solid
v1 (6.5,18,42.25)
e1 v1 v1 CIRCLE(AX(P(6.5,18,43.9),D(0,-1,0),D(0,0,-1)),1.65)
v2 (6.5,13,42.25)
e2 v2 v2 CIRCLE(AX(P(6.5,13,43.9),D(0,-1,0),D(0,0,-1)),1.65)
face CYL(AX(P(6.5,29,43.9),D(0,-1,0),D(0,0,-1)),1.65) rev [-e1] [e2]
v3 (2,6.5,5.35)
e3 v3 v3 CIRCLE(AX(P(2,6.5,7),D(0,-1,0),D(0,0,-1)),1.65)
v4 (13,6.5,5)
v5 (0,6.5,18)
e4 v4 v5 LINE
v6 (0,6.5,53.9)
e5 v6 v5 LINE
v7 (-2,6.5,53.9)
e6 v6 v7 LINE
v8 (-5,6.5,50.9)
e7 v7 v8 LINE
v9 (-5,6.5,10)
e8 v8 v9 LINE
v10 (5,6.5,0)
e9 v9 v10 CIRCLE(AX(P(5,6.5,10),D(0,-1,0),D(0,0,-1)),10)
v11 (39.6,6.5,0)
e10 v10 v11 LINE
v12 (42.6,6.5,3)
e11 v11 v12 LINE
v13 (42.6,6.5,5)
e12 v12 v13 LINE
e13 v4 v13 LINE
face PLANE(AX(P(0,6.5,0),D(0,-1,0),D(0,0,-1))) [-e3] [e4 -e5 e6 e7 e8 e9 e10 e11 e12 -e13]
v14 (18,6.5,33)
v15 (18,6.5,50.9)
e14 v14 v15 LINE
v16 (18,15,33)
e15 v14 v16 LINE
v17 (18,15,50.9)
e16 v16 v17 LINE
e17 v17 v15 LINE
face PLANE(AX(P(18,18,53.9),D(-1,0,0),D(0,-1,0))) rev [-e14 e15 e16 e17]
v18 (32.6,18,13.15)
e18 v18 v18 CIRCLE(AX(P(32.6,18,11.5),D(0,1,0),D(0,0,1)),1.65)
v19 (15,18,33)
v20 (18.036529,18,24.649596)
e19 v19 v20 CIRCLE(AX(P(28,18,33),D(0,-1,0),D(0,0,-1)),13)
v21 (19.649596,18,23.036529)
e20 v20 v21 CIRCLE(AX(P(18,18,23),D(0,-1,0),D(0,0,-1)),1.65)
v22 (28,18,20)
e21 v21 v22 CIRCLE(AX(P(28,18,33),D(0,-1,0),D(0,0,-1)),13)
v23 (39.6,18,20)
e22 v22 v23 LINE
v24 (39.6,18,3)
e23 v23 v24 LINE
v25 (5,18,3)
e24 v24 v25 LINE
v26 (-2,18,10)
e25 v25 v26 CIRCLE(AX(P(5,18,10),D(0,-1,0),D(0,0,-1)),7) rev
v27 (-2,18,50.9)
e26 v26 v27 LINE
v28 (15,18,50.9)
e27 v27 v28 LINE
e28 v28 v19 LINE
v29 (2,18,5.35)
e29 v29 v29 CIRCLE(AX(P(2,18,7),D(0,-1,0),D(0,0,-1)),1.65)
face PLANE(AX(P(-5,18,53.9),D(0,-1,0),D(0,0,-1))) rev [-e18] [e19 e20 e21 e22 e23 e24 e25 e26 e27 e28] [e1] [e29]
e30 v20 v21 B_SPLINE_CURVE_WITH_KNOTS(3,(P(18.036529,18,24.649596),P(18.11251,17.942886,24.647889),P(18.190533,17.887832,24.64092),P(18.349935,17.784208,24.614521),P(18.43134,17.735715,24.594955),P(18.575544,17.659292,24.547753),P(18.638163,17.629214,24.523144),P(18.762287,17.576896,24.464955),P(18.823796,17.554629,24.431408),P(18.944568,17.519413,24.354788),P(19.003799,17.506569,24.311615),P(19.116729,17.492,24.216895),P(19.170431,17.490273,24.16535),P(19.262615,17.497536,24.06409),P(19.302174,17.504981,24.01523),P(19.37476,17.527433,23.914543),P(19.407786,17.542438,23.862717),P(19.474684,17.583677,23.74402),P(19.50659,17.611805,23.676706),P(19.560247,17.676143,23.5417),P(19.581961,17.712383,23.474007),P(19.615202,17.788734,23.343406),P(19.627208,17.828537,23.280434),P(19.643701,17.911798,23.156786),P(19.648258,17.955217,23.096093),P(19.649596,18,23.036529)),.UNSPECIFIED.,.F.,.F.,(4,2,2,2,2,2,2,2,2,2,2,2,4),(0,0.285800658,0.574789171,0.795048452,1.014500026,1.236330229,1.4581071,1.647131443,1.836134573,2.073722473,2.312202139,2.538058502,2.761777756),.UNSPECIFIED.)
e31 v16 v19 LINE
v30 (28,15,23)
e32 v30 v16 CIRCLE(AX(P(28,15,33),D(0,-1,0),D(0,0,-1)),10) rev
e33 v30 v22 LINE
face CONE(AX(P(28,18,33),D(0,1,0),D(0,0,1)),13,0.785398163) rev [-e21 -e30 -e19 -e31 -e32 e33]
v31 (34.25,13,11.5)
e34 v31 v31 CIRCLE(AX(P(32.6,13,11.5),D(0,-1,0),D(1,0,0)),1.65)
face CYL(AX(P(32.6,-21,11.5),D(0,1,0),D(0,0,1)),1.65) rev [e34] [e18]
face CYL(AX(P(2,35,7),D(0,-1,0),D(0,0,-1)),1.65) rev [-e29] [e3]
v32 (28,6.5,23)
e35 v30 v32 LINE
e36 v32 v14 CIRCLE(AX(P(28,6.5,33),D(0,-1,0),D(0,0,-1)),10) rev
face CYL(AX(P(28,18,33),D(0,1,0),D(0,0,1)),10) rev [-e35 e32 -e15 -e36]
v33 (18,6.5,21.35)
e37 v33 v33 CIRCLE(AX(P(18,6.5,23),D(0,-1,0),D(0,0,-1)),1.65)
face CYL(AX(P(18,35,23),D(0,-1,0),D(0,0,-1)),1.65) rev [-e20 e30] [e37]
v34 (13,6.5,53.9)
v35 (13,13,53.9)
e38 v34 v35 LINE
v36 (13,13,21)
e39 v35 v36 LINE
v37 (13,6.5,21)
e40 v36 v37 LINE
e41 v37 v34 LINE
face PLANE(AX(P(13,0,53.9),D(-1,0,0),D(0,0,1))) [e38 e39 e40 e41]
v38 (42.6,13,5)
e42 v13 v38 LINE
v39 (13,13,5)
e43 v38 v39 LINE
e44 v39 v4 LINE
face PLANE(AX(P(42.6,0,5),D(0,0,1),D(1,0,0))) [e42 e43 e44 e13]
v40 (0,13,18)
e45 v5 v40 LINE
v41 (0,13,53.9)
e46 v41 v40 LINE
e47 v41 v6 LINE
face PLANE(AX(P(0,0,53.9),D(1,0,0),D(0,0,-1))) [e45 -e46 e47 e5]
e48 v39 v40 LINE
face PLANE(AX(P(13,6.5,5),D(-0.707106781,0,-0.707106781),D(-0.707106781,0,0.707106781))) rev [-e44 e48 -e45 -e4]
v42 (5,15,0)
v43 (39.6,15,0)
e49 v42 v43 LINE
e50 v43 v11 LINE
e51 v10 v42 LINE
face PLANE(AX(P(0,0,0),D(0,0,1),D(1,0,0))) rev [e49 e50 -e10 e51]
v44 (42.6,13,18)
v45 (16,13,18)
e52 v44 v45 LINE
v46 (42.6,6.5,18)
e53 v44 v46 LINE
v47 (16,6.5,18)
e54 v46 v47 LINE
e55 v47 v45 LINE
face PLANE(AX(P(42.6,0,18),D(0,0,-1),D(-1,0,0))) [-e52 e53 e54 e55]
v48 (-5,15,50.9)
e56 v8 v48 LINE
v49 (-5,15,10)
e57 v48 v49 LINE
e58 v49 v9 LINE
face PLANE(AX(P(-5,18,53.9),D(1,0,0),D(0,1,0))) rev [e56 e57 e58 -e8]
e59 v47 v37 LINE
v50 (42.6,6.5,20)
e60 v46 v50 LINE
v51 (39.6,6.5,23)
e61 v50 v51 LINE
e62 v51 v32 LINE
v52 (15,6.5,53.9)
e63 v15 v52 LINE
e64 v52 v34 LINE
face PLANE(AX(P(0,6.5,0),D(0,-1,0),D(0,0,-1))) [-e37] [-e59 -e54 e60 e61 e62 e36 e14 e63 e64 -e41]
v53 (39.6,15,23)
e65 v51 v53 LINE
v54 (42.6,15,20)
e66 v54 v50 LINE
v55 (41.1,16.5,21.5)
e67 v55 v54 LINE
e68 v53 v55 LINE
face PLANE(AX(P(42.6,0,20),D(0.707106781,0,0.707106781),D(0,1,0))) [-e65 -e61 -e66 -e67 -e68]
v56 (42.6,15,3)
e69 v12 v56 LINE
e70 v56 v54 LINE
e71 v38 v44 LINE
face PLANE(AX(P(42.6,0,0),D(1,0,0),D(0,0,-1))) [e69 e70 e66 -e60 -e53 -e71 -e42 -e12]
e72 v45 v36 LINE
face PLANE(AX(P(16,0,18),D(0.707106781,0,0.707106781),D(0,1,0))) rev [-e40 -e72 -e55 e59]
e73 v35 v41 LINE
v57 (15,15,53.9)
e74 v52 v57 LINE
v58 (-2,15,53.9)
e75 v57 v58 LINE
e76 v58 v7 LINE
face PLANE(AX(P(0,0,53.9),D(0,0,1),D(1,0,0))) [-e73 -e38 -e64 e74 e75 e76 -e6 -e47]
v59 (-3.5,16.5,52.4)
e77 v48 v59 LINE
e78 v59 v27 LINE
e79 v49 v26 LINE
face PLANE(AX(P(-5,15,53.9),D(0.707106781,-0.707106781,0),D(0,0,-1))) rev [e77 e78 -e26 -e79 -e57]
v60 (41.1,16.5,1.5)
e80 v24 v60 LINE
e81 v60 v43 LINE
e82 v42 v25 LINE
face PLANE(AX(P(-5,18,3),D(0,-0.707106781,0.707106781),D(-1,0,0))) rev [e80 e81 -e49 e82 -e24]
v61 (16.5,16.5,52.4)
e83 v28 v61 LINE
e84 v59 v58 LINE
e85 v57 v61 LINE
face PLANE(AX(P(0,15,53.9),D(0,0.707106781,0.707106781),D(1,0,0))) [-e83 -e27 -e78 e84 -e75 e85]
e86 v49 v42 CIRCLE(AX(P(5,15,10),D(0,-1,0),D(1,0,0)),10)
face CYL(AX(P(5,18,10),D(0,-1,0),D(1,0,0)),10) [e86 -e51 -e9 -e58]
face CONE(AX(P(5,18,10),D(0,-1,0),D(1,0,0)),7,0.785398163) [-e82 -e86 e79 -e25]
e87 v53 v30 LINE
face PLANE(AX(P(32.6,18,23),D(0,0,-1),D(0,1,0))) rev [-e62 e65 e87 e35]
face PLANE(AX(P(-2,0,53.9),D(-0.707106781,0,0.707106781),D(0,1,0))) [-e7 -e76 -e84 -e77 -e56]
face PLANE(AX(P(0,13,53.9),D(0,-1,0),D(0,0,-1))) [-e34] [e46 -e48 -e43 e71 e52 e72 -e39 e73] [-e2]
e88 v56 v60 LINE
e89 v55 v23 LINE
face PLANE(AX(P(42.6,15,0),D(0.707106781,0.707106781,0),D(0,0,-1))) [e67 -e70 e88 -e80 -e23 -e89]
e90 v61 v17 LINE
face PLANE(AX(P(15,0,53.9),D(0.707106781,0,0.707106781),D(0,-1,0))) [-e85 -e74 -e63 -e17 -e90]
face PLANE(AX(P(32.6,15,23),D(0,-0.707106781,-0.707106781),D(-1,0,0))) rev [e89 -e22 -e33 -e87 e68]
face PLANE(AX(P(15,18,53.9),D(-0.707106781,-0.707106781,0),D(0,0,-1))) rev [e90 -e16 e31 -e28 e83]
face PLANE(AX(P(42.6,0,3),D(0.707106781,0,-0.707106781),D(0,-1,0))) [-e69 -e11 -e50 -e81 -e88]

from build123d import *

# Parameters (mm, degrees)
SKETCH_1_W          = 23
SKETCH_1_H          = 23
SKETCH_1_W_2        = 13
SKETCH_1_H_2        = 13
EXTRUDE_1_DEPTH     = 53.9
SKETCH_2_R          = 1.65
CUT_EXTRUDE_1_DEPTH = 34
SKETCH_4_W          = 23
SKETCH_4_H          = 23
SKETCH_4_R          = 3
EXTRUDE_2_DEPTH     = 14.6
SKETCH_5_W          = 23
SKETCH_5_H          = 23
SKETCH_5_W_2        = 13
SKETCH_5_H_2        = 13
EXTRUDE_1_2_DEPTH   = 10
SKETCH_6_R          = 1.65
CUT_EXTRUDE_2_DEPTH = 39
SKETCH_7_W          = 13
SKETCH_7_H          = 13
CUT_EXTRUDE_3_DEPTH = 24.6
CHAMFER_1_SIZE      = 3
SKETCH_8_W          = 47.6
SKETCH_8_H          = 53.9
CUT_EXTRUDE_4_DEPTH = 11.5
EXTRUDE_3_DEPTH     = 6.5
FILLET_1_R          = 10
FILLET_2_R          = 10
SKETCH_10_R         = 1.65
CUT_EXTRUDE_5_DEPTH = 28.5
CHAMFER_3_SIZE      = 3
CHAMFER_4_SIZE      = 3
CHAMFER_5_SIZE      = 3


with BuildPart() as part:
    # 草图1 → Extrude 1 (new body)
    with BuildSketch(Plane.XY):
        with Locations((6.5, 6.5)):
            Rectangle(SKETCH_1_W, SKETCH_1_H)
        with Locations((6.5, 6.5)):
            Rectangle(SKETCH_1_W_2, SKETCH_1_H_2, mode=Mode.SUBTRACT)
    extrude(amount=EXTRUDE_1_DEPTH)

    # 草图2 → 切除-拉伸1 (cut)
    with BuildSketch(Plane.XZ.offset(5)):
        with Locations(Location((6.5, 43.9, 0), (0, 0, 270))):
            Circle(SKETCH_2_R)
    extrude(amount=-CUT_EXTRUDE_1_DEPTH, mode=Mode.SUBTRACT)

    # 草图4 → 凸台-拉伸2 (add)
    with BuildSketch(Plane(origin=(18, 0, 0), x_dir=(0, 0, -1), z_dir=(1, 0, 0))):
        with Locations((-11.5, 6.5)):
            Rectangle(SKETCH_4_W, SKETCH_4_H)
        with Locations(Location((-11.5, 6.5, 0), (0, 0, 90))):
            Circle(SKETCH_4_R, mode=Mode.SUBTRACT)
    extrude(amount=EXTRUDE_2_DEPTH)

    # 草图5 → Extrude 1 2 (add)
    with BuildSketch(Plane(origin=(32.6, 0, 0), x_dir=(0, 0, -1), z_dir=(1, 0, 0))):
        with Locations((-11.5, 6.5)):
            Rectangle(SKETCH_5_W, SKETCH_5_H)
        with Locations((-11.5, 6.5)):
            Rectangle(SKETCH_5_W_2, SKETCH_5_H_2, mode=Mode.SUBTRACT)
    extrude(amount=EXTRUDE_1_2_DEPTH)

    # 草图6 → 切除-拉伸2 (cut)
    with BuildSketch(Plane(origin=(0, 18, 0), x_dir=(1, 0, 0), z_dir=(0, 1, 0))):
        with Locations(Location((32.6, -11.5, 0), (0, 0, 270))):
            Circle(SKETCH_6_R)
    extrude(amount=-CUT_EXTRUDE_2_DEPTH, mode=Mode.SUBTRACT)

    # 草图7 → 切除-拉伸3 (cut)
    with BuildSketch(Plane(origin=(32.6, 0, 0), x_dir=(0, 0, -1), z_dir=(1, 0, 0))):
        with Locations((-11.5, 6.5)):
            Rectangle(SKETCH_7_W, SKETCH_7_H)
    extrude(amount=-CUT_EXTRUDE_3_DEPTH, mode=Mode.SUBTRACT)

    # 倒角1
    chamfer_1_edges = [part.edges().sort_by_distance(p)[0] for p in [
        (13, 6.5, 18),
    ]]
    chamfer(chamfer_1_edges, length=CHAMFER_1_SIZE)

    # 草图8 → 切除-拉伸4 (cut)
    with BuildSketch(Plane.XZ.offset(5)):
        with Locations((18.8, 26.95)):
            Rectangle(SKETCH_8_W, SKETCH_8_H)
    extrude(amount=-CUT_EXTRUDE_4_DEPTH, mode=Mode.SUBTRACT)

    # 草图9 → 凸台-拉伸3 (add)
    with BuildSketch(Plane.XZ.offset(-13)):
        Polygon((13, 5), (0, 18), (0, 0), (13, 0), align=None)
    extrude(amount=EXTRUDE_3_DEPTH)

    # 圆角1
    fillet_1_edges = [part.edges().sort_by_distance(p)[0] for p in [
        (-5, 12.25, 0),
    ]]
    fillet(fillet_1_edges, radius=FILLET_1_R)

    # 圆角2
    fillet_2_edges = [part.edges().sort_by_distance(p)[0] for p in [
        (18, 12.25, 23),
    ]]
    fillet(fillet_2_edges, radius=FILLET_2_R)

    # 草图10 → 切除-拉伸5 (cut)
    with BuildSketch(Plane.XZ.offset(-6.5)):
        with Locations(Location((2, 7, 0), (0, 0, 270))):
            Circle(SKETCH_10_R)
        with Locations(Location((18, 23, 0), (0, 0, 270))):
            Circle(SKETCH_10_R)
    extrude(amount=-CUT_EXTRUDE_5_DEPTH, mode=Mode.SUBTRACT)

    # 倒角3
    # the kernel refuses this chamfer: 3 mm, written as the material it takes off along each edge
    with BuildSketch(Plane(origin=(5, 18, 10), x_dir=(0, 0, -1), z_dir=(1, 0, 0))) as chamfer_3_piece_1:
        Polygon((10 - CHAMFER_3_SIZE, 0), (10, -CHAMFER_3_SIZE), (10, 0), align=None)
    revolve(axis=Axis((5, 18, 10), (0, 1, 0)), revolution_arc=90, mode=Mode.SUBTRACT)
    with BuildSketch(Plane(origin=(28, 18, 33), x_dir=(-1, 0, 0), z_dir=(0, 0, 1))) as chamfer_3_piece_2:
        Polygon((10 + CHAMFER_3_SIZE, 0), (10, CHAMFER_3_SIZE), (10, 0), align=None)
    revolve(axis=Axis((28, 18, 33), (0, -1, 0)), revolution_arc=90, mode=Mode.SUBTRACT)
    with BuildSketch(Plane(origin=(28, 18, 23), x_dir=(0, 0.027495876610586768, -0.9996219169112968), z_dir=(1, 0, 0))) as chamfer_3_piece_3:
        Polygon((CHAMFER_3_SIZE * 0.999621916911, -CHAMFER_3_SIZE * 0.0274958766106), (-CHAMFER_3_SIZE * 0.0274958766106, -CHAMFER_3_SIZE * 0.999621916911), (0, 0), align=None)
    extrude(amount=22.315048964, mode=Mode.SUBTRACT)
    with BuildSketch(Plane(origin=(50.315048964, 18, 0), x_dir=(0, 0.027495876610586778, 0.9996219169112968), z_dir=(-1, 0, 0))) as chamfer_3_piece_4:
        Polygon((CHAMFER_3_SIZE * 0.999621916911, -CHAMFER_3_SIZE * 0.0274958766106), (-CHAMFER_3_SIZE * 0.0274958766106, -CHAMFER_3_SIZE * 0.999621916911), (0, 0), align=None)
    extrude(amount=45.315048964, mode=Mode.SUBTRACT)
    with BuildSketch(Plane(origin=(-5, 18, 10), x_dir=(0.9996219169112968, 0.027495876610586778, 0), z_dir=(0, 0, 1))) as chamfer_3_piece_5:
        Polygon((CHAMFER_3_SIZE * 0.999621916911, -CHAMFER_3_SIZE * 0.0274958766106), (-CHAMFER_3_SIZE * 0.0274958766106, -CHAMFER_3_SIZE * 0.999621916911), (0, 0), align=None)
    extrude(amount=51.615048964, mode=Mode.SUBTRACT)
    with BuildSketch(Plane(origin=(18, 18, 33), x_dir=(-0.9996219169112968, 0.02749587661058678, 0), z_dir=(0, 0, 1))) as chamfer_3_piece_6:
        Polygon((CHAMFER_3_SIZE * 0.999621916911, CHAMFER_3_SIZE * 0.0274958766106), (-CHAMFER_3_SIZE * 0.0274958766106, CHAMFER_3_SIZE * 0.999621916911), (0, 0), align=None)
    extrude(amount=28.615048964, mode=Mode.SUBTRACT)

    # 倒角4
    chamfer_4_edges = [part.edges().sort_by_distance(p)[0] for p in [
        (42.6, 18, 11.5),
        (6.5, 18, 53.9),
    ]]
    chamfer(chamfer_4_edges, length=CHAMFER_4_SIZE)

    # 倒角5
    chamfer_5_edges = [part.edges().sort_by_distance(p)[0] for p in [
        (42.6, 10.75, 0),
        (18, 10.75, 53.9),
        (-5, 10.75, 53.9),
        (42.6, 10.75, 23),
    ]]
    chamfer(chamfer_5_edges, length=CHAMFER_5_SIZE)


solid = part.part
